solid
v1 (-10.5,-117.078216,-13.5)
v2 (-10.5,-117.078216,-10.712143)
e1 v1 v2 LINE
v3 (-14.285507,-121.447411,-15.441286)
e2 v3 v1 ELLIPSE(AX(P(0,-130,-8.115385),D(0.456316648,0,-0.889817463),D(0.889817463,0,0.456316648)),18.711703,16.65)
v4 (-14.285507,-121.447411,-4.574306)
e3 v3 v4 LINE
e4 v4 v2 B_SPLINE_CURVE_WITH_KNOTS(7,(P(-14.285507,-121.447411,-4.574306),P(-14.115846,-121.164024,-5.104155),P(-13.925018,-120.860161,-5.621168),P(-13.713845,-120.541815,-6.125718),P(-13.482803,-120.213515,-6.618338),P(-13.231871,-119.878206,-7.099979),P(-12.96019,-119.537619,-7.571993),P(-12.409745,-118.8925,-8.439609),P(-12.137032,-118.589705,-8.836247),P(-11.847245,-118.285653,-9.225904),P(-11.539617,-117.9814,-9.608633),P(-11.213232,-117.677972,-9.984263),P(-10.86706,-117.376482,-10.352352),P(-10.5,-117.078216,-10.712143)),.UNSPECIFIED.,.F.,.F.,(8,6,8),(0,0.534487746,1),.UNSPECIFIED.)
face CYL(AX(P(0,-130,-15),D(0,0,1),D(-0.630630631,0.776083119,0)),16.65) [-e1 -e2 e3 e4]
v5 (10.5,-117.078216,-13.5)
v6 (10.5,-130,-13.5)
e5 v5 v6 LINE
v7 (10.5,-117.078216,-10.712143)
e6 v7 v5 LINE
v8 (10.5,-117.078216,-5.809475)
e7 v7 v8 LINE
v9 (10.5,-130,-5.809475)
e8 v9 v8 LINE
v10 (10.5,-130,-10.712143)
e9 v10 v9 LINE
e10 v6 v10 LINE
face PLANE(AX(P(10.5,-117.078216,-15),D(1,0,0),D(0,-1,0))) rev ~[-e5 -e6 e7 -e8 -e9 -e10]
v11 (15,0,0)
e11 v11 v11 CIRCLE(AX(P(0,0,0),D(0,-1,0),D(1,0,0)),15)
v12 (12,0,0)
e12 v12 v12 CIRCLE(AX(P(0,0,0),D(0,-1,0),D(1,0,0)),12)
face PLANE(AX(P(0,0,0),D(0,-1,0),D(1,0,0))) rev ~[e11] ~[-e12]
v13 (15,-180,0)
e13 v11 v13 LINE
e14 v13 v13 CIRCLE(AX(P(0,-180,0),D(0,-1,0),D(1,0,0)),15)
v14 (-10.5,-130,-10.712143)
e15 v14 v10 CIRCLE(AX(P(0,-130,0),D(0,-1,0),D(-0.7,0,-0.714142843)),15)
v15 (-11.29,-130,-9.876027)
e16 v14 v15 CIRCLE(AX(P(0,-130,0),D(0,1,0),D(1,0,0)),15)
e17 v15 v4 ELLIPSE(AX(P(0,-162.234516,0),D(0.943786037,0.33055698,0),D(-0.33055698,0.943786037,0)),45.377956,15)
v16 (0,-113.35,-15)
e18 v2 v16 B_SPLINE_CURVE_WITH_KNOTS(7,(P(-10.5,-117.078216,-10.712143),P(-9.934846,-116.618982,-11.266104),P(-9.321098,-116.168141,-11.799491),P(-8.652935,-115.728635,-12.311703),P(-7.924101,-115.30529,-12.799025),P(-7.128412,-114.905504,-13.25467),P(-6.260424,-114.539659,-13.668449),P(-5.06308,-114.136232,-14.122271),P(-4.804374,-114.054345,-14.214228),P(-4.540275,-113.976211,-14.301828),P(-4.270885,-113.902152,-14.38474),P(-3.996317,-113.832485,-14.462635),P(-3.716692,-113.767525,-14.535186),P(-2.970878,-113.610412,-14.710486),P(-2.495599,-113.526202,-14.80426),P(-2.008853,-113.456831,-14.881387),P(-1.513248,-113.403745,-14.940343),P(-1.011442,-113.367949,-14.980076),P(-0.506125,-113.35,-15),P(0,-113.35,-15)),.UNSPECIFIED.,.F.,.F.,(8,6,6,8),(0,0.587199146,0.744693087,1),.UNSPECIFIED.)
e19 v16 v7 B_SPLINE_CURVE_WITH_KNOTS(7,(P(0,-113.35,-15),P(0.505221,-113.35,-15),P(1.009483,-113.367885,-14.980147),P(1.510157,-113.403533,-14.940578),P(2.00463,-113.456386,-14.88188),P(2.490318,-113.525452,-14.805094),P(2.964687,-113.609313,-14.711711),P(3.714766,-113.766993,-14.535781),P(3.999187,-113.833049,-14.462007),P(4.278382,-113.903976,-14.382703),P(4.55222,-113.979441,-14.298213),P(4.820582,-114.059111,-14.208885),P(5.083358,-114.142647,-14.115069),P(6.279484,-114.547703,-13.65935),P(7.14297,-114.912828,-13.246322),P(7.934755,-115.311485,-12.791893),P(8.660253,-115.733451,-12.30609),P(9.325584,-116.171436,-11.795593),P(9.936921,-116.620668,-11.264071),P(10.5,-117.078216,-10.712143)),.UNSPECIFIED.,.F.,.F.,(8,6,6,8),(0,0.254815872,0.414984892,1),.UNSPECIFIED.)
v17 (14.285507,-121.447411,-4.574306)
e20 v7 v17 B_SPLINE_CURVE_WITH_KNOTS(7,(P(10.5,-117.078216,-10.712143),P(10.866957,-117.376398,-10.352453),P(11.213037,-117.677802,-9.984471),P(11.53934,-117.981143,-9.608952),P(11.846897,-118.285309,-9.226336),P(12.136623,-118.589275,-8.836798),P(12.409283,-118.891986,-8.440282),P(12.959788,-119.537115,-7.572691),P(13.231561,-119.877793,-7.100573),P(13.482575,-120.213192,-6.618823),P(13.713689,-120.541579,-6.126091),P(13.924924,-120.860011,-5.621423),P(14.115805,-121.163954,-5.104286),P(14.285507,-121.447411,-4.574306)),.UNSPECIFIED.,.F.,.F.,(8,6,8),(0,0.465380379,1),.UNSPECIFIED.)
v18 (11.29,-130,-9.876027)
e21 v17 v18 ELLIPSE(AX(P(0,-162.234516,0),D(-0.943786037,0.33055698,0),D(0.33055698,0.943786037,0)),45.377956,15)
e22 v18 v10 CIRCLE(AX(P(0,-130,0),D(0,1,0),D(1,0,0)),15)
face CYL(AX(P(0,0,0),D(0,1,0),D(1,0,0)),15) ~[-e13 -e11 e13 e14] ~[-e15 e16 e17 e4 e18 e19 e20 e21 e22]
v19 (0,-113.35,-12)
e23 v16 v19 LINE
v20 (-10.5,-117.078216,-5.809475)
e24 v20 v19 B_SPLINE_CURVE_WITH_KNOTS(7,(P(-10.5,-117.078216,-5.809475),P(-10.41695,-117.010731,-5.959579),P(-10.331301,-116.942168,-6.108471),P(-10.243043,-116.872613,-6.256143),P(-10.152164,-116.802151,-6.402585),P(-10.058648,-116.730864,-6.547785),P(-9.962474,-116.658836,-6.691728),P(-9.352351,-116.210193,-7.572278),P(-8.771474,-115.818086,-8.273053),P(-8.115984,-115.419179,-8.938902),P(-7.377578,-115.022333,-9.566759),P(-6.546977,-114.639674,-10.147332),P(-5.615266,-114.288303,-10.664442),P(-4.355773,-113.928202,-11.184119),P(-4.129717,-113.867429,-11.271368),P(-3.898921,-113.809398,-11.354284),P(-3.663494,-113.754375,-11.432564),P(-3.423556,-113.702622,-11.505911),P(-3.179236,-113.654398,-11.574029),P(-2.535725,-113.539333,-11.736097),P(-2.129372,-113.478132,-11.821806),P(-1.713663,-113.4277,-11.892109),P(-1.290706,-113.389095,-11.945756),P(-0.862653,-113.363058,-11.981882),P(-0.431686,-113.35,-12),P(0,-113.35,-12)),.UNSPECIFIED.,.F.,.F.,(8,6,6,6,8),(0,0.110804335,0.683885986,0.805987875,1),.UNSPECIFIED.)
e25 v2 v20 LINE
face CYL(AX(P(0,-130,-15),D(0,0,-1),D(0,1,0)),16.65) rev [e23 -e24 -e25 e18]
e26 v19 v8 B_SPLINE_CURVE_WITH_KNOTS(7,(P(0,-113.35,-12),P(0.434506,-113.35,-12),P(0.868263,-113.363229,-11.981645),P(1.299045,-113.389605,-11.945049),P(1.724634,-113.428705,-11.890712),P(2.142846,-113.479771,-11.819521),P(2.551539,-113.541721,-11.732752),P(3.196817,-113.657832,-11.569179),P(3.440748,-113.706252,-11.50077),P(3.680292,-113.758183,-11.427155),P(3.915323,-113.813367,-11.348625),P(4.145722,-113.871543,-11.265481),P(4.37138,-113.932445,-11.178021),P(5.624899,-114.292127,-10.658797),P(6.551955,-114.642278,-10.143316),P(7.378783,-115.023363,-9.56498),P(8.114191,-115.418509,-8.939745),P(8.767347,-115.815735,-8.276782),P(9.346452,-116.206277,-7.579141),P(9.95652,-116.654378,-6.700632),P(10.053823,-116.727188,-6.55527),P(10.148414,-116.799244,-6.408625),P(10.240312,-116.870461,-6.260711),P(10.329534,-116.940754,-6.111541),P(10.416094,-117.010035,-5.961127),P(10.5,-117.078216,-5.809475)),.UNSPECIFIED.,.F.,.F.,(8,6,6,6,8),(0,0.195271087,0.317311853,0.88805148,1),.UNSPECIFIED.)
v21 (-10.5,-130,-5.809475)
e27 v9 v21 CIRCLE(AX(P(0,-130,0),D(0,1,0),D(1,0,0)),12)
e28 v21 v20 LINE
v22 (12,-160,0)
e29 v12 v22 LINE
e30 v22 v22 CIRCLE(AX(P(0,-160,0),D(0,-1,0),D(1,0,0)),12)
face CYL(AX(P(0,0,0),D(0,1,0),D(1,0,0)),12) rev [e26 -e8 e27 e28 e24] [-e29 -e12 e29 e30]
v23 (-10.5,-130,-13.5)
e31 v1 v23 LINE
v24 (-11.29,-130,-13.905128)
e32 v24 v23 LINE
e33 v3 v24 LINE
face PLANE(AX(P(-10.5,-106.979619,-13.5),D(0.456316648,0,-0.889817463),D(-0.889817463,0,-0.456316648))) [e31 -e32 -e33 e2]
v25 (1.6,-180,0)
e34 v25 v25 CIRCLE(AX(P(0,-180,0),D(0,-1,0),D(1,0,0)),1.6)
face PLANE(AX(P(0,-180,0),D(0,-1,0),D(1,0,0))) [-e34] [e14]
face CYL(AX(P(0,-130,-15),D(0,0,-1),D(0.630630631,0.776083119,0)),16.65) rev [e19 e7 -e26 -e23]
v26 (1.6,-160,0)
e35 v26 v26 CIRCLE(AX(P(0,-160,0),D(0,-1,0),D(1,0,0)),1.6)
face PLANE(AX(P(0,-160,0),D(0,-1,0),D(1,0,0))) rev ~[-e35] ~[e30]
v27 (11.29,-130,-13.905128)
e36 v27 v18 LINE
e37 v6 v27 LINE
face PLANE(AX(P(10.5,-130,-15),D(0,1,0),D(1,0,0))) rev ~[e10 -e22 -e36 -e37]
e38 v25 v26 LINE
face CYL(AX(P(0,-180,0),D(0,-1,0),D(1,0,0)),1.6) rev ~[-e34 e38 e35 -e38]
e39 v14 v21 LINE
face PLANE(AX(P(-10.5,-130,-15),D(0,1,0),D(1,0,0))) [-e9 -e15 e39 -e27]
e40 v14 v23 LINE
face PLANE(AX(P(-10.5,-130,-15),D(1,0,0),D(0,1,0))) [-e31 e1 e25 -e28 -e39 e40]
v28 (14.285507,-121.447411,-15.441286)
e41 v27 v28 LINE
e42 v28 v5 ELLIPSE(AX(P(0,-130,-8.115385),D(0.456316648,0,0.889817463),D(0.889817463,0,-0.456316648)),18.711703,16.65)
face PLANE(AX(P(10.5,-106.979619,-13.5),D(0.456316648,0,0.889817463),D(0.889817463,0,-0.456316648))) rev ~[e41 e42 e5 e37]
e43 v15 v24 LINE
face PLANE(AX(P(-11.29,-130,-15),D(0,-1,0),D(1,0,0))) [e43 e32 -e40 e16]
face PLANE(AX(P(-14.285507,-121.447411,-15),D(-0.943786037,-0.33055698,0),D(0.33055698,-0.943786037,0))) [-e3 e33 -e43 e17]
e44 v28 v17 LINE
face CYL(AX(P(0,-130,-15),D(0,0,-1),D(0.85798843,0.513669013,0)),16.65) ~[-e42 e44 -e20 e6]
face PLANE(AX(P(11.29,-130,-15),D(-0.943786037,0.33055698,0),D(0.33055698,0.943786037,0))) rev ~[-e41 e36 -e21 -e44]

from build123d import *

# Parameters (mm, degrees)
F0_R         = 15
F0_R_2       = 12
F1_DEPTH     = 180
F2_DEPTH     = 160
F5_DEPTH     = 20
F6_DEPTH     = 18
F7_DEPTH     = 0.5
F8_DEPTH     = 160
F9_T1_DEPTH  = 33.1189779758
F10_T1_DEPTH = 33.1189779758
F11_R        = 1.6
F12_DEPTH    = 20


# Not quite as in the source:
# - a fillet or chamfer that OpenCascade refuses, or shapes differently, is made with other operations: its cross-section is extruded or revolved along the edge and cut away or added


with BuildPart() as f1:
    # F0 (on Front) → F1 (new body)
    with BuildSketch(Plane.XZ):
        Circle(F0_R)
        Circle(F0_R_2, mode=Mode.SUBTRACT)
        Circle(F0_R_2)
    extrude(amount=F1_DEPTH)

    # F0 (on Front) → F2 (cut)
    with BuildSketch(Plane.XZ):
        Circle(F0_R_2)
    extrude(amount=F2_DEPTH, mode=Mode.SUBTRACT)

    # F4 (on offset) → F5 (cut)
    with BuildSketch(Plane.XY.offset(-15)):
        with BuildLine():
            ThreePointArc((10.5, -117.0782160674), (5.5711218584, -114.3097131563), (0, -113.35))
            Line((0, -113.35), (0, -130))
            Line((0, -130), (7, -130))
            Line((7, -130), (10.5, -130))
            Line((10.5, -130), (10.5, -117.0782160674))
        make_face()
        with BuildLine():
            Line((0, -130), (0, -113.35))
            ThreePointArc((0, -113.35), (-5.5711218584, -114.3097131563), (-10.5, -117.0782160674))
            Line((-10.5, -117.0782160674), (-10.5, -130))
            Line((-10.5, -130), (-7, -130))
            Line((-7, -130), (0, -130))
        make_face()
    extrude(amount=F5_DEPTH, mode=Mode.SUBTRACT)

    # F4 (on offset) → F6 (join)
    with BuildSketch(Plane.XY.offset(-15)):
        with BuildLine():
            ThreePointArc((14.2855073516, -121.4474109355), (12.5838312774, -119.0972622529), (10.5, -117.0782160674))
            Line((10.5, -117.0782160674), (10.5, -130))
            Line((10.5, -130), (11.29, -130))
            Line((11.29, -130), (14.2855073516, -121.4474109355))
        make_face()
        with BuildLine():
            Line((-10.5, -130), (-10.5, -117.0782160674))
            ThreePointArc((-10.5, -117.0782160674), (-12.5838312774, -119.0972622529), (-14.2855073516, -121.4474109355))
            Line((-14.2855073516, -121.4474109355), (-11.29, -130))
            Line((-11.29, -130), (-10.5, -130))
        make_face()
    extrude(amount=F6_DEPTH)

    # F4 (on offset) → F7 (join)
    with BuildSketch(Plane.XY.offset(-15)):
        with BuildLine():
            Line((-10.5, -130), (-10.5, -117.0782160674))
            ThreePointArc((-10.5, -117.0782160674), (-12.5838312774, -119.0972622529), (-14.2855073516, -121.4474109355))
            Line((-14.2855073516, -121.4474109355), (-11.29, -130))
            Line((-11.29, -130), (-10.5, -130))
        make_face()
        with BuildLine():
            ThreePointArc((14.2855073516, -121.4474109355), (12.5838312774, -119.0972622529), (10.5, -117.0782160674))
            Line((10.5, -117.0782160674), (10.5, -130))
            Line((10.5, -130), (11.29, -130))
            Line((11.29, -130), (14.2855073516, -121.4474109355))
        make_face()
    extrude(amount=-F7_DEPTH)

    # F0 (on Front) → F8 (cut)
    with BuildSketch(Plane.XZ):
        Circle(F0_R_2)
    extrude(amount=F8_DEPTH, mode=Mode.SUBTRACT)

    # F9: chamfer of 3.9 x 2 on 1 edges, made by hand

    # F9_s2 → F9_t1 (cut)
    with BuildSketch(Plane.XZ.offset(106.9796190458)):
        Polygon((10.5, -13.5), (14.4, -15.5), (10.5, -15.5), align=None)
    extrude(amount=F9_T1_DEPTH, mode=Mode.SUBTRACT)

    # F10: chamfer of 2 x 3.9 on 1 edges, made by hand

    # F10_s2 → F10_t1 (cut)
    with BuildSketch(Plane.XZ.offset(106.9796190458)):
        Polygon((-10.5, -13.5), (-14.4, -15.5), (-10.5, -15.5), align=None)
    extrude(amount=F10_T1_DEPTH, mode=Mode.SUBTRACT)

    # F11 (on face) → F12 (cut)
    with BuildSketch(Plane.XZ.offset(180)):
        Circle(F11_R)
    extrude(amount=-F12_DEPTH, mode=Mode.SUBTRACT)


solid = f1.part
